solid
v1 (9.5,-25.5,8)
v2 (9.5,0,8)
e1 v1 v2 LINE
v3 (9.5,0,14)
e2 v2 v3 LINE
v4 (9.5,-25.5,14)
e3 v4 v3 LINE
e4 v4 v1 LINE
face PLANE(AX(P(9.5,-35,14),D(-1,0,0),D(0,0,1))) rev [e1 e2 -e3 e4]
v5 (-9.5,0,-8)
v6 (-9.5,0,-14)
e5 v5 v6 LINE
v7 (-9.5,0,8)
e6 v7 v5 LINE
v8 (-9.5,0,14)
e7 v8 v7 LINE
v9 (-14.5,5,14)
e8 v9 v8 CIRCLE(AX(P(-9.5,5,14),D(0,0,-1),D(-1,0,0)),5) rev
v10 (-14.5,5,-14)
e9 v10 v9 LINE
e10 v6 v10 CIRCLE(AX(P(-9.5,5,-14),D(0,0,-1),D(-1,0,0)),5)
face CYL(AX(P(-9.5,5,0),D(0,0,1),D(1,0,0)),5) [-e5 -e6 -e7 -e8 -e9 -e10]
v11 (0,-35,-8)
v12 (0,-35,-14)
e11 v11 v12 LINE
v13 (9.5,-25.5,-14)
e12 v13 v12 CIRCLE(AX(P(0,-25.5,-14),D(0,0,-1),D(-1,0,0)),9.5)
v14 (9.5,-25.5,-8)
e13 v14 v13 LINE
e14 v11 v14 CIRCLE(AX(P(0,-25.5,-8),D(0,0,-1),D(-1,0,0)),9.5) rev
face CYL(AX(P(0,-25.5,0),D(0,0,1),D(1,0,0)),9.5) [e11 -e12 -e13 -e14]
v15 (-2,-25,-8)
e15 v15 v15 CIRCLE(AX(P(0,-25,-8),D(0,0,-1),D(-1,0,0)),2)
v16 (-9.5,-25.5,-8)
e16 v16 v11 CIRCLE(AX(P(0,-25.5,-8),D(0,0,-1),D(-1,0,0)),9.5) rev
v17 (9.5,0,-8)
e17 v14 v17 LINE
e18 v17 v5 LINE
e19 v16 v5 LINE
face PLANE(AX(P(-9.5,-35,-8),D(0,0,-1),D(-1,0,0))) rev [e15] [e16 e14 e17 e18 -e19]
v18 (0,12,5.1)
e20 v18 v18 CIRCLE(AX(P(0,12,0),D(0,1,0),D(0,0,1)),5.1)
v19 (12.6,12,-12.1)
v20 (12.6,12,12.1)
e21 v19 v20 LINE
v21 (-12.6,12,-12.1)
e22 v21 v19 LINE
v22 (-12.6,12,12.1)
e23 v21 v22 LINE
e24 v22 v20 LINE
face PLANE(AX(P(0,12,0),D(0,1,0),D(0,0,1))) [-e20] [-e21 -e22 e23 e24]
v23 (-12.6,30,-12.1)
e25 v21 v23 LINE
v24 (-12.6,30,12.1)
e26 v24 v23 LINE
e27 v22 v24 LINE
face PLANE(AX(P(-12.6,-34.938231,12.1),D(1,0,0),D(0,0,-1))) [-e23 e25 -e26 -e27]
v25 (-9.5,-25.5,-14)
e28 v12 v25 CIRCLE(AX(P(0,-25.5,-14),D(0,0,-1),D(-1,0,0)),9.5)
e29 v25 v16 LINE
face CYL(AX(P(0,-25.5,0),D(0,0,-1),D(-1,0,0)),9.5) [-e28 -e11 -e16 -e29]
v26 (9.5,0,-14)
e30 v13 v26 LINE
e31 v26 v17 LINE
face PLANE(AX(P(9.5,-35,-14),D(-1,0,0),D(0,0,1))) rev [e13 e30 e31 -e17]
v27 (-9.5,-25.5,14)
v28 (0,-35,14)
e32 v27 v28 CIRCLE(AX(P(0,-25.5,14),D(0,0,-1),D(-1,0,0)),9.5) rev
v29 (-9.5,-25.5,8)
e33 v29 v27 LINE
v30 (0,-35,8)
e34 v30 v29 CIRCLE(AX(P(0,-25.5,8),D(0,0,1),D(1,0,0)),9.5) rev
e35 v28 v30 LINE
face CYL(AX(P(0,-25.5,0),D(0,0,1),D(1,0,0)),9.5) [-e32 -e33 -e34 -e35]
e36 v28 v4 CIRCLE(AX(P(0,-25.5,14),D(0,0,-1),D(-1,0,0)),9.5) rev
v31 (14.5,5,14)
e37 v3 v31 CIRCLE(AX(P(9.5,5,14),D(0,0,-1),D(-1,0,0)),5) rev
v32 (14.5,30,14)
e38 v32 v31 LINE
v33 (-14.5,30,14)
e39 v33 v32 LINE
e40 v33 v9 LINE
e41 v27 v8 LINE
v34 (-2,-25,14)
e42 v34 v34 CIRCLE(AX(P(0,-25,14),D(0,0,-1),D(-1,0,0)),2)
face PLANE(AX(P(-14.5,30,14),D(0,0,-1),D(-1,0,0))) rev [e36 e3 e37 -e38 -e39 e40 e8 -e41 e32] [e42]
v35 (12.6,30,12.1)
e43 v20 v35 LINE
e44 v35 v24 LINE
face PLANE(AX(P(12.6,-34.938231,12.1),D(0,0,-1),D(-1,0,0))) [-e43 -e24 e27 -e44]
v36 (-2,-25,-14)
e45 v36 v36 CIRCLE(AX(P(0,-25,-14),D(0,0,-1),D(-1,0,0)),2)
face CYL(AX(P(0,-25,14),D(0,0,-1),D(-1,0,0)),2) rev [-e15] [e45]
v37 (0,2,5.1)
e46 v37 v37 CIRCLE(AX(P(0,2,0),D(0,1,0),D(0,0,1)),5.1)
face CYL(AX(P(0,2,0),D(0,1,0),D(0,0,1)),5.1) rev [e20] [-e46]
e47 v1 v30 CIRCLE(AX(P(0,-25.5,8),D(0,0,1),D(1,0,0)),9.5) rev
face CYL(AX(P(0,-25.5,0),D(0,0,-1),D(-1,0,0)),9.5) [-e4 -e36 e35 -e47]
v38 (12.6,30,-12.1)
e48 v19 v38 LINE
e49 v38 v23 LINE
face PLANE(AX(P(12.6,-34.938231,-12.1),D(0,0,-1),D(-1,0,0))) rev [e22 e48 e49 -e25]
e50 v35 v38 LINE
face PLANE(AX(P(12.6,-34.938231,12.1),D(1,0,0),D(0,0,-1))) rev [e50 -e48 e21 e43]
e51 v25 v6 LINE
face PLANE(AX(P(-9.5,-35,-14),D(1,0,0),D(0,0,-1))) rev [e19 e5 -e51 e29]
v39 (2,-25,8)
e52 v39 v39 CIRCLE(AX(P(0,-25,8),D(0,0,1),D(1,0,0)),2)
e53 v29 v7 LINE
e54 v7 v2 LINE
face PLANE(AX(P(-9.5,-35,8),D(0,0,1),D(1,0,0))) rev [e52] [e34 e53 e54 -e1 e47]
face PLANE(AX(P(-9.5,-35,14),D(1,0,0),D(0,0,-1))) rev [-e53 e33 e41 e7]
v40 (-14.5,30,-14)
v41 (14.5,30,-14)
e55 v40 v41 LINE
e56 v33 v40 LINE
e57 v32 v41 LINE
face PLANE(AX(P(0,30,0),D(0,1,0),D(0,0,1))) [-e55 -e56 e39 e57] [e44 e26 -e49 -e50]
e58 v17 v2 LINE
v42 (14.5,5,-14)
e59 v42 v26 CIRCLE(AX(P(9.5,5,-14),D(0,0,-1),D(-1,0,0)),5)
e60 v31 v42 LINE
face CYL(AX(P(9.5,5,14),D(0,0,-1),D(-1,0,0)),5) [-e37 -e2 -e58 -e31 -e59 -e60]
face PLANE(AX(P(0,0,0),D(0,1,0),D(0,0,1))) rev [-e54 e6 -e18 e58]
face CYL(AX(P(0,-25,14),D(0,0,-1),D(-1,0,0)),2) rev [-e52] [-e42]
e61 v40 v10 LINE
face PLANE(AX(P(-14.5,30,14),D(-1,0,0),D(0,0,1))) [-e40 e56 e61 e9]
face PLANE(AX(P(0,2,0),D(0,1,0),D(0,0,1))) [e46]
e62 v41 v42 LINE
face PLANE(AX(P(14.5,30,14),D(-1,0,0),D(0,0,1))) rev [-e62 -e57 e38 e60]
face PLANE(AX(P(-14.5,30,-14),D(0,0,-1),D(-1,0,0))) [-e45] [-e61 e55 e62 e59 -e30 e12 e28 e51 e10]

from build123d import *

# Parameters (mm, degrees)
SKETCH_1_W          = 29
SKETCH_1_H          = 28
EXTRUDE_3_DEPTH     = 30
SKETCH_2_W          = 19
SKETCH_2_H          = 6
EXTRUDE_4_DEPTH     = 35
SKETCH_3_R          = 2
CUT_EXTRUDE_3_DEPTH = 48.108916353
SKETCH_4_W          = 25.2
SKETCH_4_H          = 24.2
CUT_EXTRUDE_4_DEPTH = 18
CUT_EXTRUDE_START   = -18
SKETCH_4_3_R        = 5.1
CUT_EXTRUDE_5_DEPTH = 10
FILLET_1_R          = 5
FILLET_2_R          = 9.5


with BuildPart() as part:
    # 草图1 → 凸台-拉伸3 (new body)
    with BuildSketch(Plane(origin=(0, 0, 0), x_dir=(1, 0, 0), z_dir=(0, 1, 0))):
        Rectangle(SKETCH_1_W, SKETCH_1_H)
    extrude(amount=EXTRUDE_3_DEPTH)

    # 草图2 → 凸台-拉伸4 (add)
    with BuildSketch(Plane.XZ):
        with Locations((0, -11)):
            Rectangle(SKETCH_2_W, SKETCH_2_H)
        with Locations((0, 11)):
            Rectangle(SKETCH_2_W, SKETCH_2_H)
    extrude(amount=EXTRUDE_4_DEPTH)

    # 草图3 → 切除-拉伸3 (cut, through all)
    with BuildSketch(Plane(origin=(0, 0, -14), x_dir=(-1, 0, 0), z_dir=(0, 0, -1))):
        with Locations((0, -25)):
            Circle(SKETCH_3_R)
    extrude(amount=-CUT_EXTRUDE_3_DEPTH, mode=Mode.SUBTRACT)

    # 草图4 → 切除-拉伸4 (cut)
    with BuildSketch(Plane(origin=(0, 30, 0), x_dir=(1, 0, 0), z_dir=(0, 1, 0))):
        Rectangle(SKETCH_4_W, SKETCH_4_H)
    extrude(amount=-CUT_EXTRUDE_4_DEPTH, mode=Mode.SUBTRACT)

    # 草图4<3> → 切除-拉伸5 (cut)
    with BuildSketch(Plane(origin=(0, 30, 0), x_dir=(1, 0, 0), z_dir=(0, 1, 0)).offset(CUT_EXTRUDE_START)):
        with Locations(Location((0, 0, 0), (0, 0, 270))):
            Circle(SKETCH_4_3_R)
    extrude(amount=-CUT_EXTRUDE_5_DEPTH, mode=Mode.SUBTRACT)

    # 圆角1
    fillet_1_edges = [part.edges().sort_by_distance(p)[0] for p in [
        (-14.5, 0, 0),
        (14.5, 0, 0),
    ]]
    fillet(fillet_1_edges, radius=FILLET_1_R)

    # 圆角2
    fillet_2_edges = [part.edges().sort_by_distance(p)[0] for p in [
        (9.5, -35, -11),
        (-9.5, -35, -11),
        (9.5, -35, 11),
        (-9.5, -35, 11),
    ]]
    fillet(fillet_2_edges, radius=FILLET_2_R - 0.0001)  # a hair under: the kernel refuses the full size


solid = part.part
